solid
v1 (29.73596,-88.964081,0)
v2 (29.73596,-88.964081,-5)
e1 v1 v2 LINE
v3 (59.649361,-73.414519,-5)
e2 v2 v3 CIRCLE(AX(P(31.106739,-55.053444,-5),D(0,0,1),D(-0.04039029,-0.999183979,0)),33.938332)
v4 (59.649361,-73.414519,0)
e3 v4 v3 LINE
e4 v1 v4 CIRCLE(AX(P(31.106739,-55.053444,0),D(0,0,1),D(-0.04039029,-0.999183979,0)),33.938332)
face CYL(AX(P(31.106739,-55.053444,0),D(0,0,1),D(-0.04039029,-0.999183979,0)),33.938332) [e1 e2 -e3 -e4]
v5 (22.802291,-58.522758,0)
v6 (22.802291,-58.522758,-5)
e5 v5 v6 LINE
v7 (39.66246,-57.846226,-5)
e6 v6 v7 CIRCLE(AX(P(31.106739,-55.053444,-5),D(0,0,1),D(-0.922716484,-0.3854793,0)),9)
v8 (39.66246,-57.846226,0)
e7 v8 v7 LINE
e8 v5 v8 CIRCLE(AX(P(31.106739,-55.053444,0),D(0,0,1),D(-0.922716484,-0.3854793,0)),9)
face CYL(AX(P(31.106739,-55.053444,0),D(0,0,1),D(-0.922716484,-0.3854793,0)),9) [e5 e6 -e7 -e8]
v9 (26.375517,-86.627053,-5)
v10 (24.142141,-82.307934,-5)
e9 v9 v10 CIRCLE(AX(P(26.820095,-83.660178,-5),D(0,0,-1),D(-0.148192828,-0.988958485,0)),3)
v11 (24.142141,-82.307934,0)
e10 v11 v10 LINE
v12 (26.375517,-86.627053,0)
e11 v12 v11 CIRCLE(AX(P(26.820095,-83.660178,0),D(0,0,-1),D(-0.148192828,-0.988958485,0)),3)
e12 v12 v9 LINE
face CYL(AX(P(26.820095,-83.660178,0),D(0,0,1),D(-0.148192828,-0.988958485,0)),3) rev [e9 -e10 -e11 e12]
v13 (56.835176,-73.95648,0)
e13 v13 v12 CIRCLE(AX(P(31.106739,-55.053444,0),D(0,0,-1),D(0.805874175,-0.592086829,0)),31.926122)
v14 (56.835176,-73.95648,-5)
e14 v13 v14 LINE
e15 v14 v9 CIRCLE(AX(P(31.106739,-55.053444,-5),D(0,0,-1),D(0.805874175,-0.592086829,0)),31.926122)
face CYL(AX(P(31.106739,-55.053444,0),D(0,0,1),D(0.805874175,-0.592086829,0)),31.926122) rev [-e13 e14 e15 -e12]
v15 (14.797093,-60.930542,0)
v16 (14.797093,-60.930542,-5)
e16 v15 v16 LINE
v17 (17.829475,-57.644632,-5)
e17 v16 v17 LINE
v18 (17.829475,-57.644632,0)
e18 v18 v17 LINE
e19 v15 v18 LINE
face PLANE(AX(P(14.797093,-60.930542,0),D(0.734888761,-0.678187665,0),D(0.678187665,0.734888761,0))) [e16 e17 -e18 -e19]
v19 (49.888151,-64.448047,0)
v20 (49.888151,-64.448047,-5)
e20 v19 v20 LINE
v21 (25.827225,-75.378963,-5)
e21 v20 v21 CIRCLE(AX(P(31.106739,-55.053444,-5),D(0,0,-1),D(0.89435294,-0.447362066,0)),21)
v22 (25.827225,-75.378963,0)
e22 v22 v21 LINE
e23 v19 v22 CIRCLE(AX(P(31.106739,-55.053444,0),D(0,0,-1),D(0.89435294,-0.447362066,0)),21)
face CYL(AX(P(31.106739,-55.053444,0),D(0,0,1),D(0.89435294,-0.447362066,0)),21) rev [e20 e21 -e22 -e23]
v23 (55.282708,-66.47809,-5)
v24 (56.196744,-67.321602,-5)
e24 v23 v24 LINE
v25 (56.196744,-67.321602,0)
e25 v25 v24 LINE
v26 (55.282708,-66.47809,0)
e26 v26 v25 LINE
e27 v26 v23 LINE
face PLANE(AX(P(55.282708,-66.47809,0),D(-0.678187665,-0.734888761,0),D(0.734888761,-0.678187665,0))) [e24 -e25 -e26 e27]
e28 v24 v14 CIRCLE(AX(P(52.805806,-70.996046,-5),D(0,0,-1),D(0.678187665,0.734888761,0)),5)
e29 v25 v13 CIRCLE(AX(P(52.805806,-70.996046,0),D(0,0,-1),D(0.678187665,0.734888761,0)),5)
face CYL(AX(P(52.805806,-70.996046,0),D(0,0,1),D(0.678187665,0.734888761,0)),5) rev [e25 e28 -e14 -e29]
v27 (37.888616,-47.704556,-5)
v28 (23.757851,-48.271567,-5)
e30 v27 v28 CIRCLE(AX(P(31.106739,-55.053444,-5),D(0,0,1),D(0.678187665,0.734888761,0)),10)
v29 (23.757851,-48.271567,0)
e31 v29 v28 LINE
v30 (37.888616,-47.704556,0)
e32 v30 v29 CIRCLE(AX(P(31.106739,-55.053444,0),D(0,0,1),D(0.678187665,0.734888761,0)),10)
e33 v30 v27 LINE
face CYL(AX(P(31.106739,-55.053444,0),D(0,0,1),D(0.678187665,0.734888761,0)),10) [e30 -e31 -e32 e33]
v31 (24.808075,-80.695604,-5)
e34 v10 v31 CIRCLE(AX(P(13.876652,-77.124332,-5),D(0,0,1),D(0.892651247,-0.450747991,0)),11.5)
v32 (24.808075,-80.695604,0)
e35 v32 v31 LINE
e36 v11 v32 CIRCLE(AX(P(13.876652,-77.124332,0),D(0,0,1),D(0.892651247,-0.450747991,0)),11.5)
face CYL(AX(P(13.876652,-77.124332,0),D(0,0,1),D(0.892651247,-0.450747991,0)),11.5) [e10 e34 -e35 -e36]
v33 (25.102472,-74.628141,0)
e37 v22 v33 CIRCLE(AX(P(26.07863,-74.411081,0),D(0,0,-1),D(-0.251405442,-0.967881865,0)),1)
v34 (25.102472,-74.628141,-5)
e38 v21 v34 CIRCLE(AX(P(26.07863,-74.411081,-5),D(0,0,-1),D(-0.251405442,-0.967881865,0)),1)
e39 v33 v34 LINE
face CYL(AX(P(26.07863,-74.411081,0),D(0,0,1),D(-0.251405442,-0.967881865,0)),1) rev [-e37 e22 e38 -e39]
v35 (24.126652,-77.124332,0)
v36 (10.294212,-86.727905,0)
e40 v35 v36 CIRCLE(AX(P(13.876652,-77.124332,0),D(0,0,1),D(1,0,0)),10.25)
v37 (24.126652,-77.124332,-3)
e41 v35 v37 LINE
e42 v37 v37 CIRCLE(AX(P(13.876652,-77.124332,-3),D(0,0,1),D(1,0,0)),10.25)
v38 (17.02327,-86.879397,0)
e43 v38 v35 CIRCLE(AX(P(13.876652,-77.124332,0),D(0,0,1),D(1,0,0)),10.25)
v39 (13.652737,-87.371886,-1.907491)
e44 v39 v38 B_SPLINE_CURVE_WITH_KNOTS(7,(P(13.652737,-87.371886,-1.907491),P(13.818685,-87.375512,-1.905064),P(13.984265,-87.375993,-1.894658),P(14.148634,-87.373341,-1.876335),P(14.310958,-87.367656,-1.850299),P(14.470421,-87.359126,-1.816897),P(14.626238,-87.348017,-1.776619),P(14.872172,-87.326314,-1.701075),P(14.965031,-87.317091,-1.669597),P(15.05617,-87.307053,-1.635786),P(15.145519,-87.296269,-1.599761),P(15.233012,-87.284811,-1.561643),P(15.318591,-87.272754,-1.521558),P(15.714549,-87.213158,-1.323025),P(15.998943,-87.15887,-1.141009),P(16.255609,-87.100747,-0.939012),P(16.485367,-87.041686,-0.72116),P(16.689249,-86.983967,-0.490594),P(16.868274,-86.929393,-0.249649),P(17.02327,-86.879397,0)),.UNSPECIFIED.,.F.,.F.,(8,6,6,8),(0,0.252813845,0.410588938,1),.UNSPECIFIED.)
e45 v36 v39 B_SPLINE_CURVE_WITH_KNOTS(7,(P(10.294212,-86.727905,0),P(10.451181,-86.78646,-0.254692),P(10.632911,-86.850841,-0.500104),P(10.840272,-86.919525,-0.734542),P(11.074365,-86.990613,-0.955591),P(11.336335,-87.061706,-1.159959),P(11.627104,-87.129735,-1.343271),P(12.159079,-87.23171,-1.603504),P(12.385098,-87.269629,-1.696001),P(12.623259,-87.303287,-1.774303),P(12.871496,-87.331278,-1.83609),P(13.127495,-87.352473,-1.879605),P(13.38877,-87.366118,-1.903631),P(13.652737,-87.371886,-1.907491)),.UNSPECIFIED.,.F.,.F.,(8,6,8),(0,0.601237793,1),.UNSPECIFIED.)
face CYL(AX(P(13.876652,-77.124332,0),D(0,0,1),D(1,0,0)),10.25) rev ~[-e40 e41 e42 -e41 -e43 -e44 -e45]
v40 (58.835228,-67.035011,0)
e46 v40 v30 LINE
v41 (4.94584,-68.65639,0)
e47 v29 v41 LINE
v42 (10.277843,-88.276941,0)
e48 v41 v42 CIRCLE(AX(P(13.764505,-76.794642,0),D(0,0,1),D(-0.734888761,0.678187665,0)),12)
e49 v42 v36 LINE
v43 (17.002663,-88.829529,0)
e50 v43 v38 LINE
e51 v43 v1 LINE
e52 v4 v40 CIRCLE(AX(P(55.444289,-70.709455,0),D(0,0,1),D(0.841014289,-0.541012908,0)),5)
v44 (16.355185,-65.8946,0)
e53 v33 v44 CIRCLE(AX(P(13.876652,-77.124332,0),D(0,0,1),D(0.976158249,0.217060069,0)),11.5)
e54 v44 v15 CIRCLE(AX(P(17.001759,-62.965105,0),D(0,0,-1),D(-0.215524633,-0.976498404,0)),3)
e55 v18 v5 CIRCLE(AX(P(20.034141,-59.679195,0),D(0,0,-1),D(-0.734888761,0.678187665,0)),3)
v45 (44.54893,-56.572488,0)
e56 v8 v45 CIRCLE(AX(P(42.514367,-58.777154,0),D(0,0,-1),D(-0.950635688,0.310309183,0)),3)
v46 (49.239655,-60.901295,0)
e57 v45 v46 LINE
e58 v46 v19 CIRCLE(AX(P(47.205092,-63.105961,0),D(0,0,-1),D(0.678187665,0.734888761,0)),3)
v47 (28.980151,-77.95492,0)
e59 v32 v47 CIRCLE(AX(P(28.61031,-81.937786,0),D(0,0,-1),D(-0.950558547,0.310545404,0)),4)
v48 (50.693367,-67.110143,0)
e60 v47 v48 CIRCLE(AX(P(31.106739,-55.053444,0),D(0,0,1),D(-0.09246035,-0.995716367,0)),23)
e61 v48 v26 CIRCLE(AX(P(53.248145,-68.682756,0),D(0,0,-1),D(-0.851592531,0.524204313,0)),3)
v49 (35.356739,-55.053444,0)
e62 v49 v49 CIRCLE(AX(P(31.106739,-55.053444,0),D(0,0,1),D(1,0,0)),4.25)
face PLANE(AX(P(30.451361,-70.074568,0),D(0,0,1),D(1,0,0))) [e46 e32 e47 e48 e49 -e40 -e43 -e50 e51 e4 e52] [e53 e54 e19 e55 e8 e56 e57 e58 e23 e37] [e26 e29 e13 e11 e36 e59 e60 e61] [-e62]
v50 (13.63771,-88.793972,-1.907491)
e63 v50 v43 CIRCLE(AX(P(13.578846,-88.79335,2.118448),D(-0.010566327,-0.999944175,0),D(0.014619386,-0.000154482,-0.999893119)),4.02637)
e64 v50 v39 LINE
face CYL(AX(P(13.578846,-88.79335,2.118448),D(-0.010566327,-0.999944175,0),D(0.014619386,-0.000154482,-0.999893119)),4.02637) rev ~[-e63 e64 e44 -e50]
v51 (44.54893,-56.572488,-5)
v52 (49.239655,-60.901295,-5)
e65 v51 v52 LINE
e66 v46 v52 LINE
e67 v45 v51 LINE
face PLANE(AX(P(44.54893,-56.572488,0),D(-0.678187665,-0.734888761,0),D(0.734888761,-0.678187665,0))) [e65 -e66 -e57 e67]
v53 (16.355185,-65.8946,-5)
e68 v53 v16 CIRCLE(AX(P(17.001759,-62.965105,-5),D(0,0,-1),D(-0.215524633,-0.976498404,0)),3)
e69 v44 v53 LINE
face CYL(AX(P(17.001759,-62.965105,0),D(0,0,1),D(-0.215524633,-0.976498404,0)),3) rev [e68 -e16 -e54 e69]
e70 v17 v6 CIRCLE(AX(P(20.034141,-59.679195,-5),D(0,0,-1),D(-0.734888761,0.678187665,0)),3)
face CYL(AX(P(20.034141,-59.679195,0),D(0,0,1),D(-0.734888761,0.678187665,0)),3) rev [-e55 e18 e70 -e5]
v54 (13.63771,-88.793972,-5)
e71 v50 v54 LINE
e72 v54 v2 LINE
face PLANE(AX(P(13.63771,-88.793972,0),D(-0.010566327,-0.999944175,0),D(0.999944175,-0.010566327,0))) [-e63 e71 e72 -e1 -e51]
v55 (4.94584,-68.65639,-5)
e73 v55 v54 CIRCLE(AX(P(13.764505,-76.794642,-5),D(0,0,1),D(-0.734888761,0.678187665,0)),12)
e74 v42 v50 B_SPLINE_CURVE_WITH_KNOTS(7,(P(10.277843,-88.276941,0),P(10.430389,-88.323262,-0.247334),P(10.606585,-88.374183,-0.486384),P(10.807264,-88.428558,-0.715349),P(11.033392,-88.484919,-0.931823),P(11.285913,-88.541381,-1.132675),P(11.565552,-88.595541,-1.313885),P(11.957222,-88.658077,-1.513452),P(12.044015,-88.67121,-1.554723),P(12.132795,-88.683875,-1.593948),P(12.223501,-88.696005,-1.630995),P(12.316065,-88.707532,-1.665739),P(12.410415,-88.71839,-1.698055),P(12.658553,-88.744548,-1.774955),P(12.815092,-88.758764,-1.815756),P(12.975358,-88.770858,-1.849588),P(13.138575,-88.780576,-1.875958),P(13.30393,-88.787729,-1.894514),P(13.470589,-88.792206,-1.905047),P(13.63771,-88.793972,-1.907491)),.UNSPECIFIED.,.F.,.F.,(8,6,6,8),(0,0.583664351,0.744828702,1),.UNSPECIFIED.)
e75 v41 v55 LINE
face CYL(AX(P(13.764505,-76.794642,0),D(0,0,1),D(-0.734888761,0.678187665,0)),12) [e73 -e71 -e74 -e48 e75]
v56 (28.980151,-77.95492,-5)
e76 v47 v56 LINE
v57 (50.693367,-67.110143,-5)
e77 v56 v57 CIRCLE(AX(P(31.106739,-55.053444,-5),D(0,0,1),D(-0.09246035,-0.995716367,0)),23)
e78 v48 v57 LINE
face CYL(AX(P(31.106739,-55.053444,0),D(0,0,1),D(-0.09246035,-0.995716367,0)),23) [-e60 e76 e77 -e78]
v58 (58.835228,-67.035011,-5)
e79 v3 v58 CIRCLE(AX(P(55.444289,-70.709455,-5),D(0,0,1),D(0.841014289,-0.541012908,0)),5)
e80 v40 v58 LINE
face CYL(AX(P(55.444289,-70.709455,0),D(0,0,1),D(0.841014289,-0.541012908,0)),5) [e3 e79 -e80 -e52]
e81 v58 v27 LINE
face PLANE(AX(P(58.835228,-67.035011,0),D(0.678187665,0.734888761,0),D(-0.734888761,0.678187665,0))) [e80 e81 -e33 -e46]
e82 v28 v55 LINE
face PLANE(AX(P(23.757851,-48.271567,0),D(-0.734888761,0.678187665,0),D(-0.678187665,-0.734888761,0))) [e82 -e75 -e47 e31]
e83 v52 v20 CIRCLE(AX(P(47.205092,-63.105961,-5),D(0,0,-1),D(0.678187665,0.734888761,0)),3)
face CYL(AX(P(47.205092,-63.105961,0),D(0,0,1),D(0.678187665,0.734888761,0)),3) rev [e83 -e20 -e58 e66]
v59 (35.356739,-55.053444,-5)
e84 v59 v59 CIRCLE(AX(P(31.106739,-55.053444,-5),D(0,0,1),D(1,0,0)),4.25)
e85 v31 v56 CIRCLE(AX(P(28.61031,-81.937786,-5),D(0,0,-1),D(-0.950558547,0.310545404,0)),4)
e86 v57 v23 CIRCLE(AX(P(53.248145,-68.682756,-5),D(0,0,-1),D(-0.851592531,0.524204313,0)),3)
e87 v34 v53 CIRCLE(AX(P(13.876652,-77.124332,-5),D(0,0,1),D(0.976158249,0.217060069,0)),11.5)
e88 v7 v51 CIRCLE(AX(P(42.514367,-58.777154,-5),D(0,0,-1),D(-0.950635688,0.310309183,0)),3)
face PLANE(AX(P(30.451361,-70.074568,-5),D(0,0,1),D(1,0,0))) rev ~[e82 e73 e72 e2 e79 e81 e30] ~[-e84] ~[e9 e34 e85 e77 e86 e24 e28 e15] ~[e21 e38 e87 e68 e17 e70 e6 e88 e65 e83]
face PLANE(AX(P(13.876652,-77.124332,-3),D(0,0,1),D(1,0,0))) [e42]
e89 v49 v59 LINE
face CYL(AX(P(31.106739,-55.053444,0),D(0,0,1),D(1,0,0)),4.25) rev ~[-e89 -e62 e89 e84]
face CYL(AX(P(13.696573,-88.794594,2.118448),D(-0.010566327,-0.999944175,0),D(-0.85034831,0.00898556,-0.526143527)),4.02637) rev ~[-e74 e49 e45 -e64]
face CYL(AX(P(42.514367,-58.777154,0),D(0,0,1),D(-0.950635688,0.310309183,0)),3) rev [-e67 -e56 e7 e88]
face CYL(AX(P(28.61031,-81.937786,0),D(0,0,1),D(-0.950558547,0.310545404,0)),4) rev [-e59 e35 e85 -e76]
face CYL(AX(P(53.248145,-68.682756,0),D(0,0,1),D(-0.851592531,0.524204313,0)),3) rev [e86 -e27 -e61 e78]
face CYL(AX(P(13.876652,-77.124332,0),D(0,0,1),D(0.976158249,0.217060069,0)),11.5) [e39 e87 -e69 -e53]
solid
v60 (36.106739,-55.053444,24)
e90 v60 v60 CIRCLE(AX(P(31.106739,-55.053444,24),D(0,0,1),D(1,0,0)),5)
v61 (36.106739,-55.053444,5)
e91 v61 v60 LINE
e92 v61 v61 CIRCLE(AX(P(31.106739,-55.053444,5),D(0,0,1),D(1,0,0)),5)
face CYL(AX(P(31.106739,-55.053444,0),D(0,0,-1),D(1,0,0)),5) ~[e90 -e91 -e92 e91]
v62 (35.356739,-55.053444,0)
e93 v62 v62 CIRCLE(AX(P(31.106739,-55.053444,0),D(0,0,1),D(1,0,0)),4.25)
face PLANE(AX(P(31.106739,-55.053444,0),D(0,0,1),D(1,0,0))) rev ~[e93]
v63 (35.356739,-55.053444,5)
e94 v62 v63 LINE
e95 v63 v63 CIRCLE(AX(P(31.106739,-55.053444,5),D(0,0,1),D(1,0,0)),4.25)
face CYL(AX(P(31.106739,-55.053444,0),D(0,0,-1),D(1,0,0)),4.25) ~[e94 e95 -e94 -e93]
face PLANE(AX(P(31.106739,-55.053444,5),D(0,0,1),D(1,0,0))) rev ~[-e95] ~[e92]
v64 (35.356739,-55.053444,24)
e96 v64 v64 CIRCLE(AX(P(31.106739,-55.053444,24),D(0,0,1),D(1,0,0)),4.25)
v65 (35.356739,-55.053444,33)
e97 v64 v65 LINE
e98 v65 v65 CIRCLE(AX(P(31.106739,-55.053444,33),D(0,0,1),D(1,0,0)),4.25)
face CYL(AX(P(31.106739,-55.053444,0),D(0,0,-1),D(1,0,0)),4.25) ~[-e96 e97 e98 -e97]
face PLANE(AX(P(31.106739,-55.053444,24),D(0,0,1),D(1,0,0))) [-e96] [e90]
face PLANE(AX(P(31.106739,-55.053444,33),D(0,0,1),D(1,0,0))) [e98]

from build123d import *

# Parameters (mm, degrees)
F0_R     = 10.25
F0_R_2   = 5
F0_R_3   = 4.25
F1_DEPTH = 5
F2_DEPTH = 33
F3_DEPTH = 24
F4_DEPTH = 3
F5_DEPTH = 5
F7_DEPTH = 2.0316230768


# Not quite as in the source:
# - a feature names something its author has since deleted; it is built from what else it names


with BuildPart() as f1:
    # F0 (on Top) → F1 (new body)
    with BuildSketch(Plane.XY):
        with BuildLine():
            ThreePointArc((37.8886156331, -47.7045562268), (30.7058016888, -45.0614846038), (23.757851373, -48.271567184))
            Line((23.757851373, -48.271567184), (4.9458403192, -68.6563901516))
            ThreePointArc((4.9458403192, -68.6563901516), (2.7469798041, -81.5500736227), (13.6377095304, -88.793972231))
            Line((13.6377095304, -88.793972231), (29.73595993, -88.9640810988))
            ThreePointArc((29.73595993, -88.9640810988), (46.7599967293, -85.1663293947), (59.6493608288, -73.4145193188))
            ThreePointArc((59.6493608288, -73.4145193188), (60.4040648618, -70.0765035789), (58.8352277111, -67.0350109763))
            Line((58.8352277111, -67.0350109763), (37.8886156331, -47.7045562268))
        make_face()
        with Locations((13.8766520367, -77.1243319886)):
            Circle(F0_R, mode=Mode.SUBTRACT)
        with BuildLine():
            ThreePointArc((26.3755166306, -86.6270533164), (24.155278042, -85.0381292254), (24.1421413752, -82.307933887))
            ThreePointArc((24.1421413752, -82.307933887), (24.5057243444, -81.5144142062), (24.808075333, -80.6956041311))
            ThreePointArc((24.808075333, -80.6956041311), (26.4141385233, -78.5946086732), (28.9801509243, -77.9549202777))
            ThreePointArc((28.9801509243, -77.9549202777), (41.3836815678, -75.6297518396), (50.6933671902, -67.110143028))
            ThreePointArc((50.6933671902, -67.110143028), (52.8388421265, -65.7108085683), (55.2827077781, -66.4780896835))
            Line((55.2827077781, -66.4780896835), (56.196743854, -67.321602369))
            ThreePointArc((56.196743854, -67.321602369), (57.7828175357, -70.5171396289), (56.835176405, -73.9564803202))
            ThreePointArc((56.835176405, -73.9564803202), (43.3687378078, -84.5309041293), (26.3755166306, -86.6270533164))
        make_face(mode=Mode.SUBTRACT)
        with BuildLine():
            ThreePointArc((17.829474896, -57.6446324429), (20.5558252215, -56.7249026703), (22.8022906293, -58.5227575376))
            ThreePointArc((22.8022906293, -58.5227575376), (31.4675825452, -64.046207144), (39.6624601723, -57.8462264813))
            ThreePointArc((39.6624601723, -57.8462264813), (41.7576536692, -55.8741582362), (44.5489302313, -56.5724877473))
            Line((44.5489302313, -56.5724877473), (49.2396549007, -60.901294746))
            ThreePointArc((49.2396549007, -60.901294746), (50.1561683514, -62.5663798864), (49.8881507259, -64.4480472275))
            ThreePointArc((49.8881507259, -64.4480472275), (39.7927356809, -74.1728962685), (25.8272247035, -75.3789629921))
            ThreePointArc((25.8272247035, -75.3789629921), (25.3591431783, -75.10558707), (25.1024718967, -74.6281411964))
            ThreePointArc((25.1024718967, -74.6281411964), (22.0019832723, -68.9862122849), (16.3551853155, -65.8946003451))
            ThreePointArc((16.3551853155, -65.8946003451), (14.1394417768, -63.8635142203), (14.7970929317, -60.9305421383))
            Line((14.7970929317, -60.9305421383), (17.829474896, -57.6446324429))
        make_face(mode=Mode.SUBTRACT)
        with Locations((31.1067389816, -55.0534438355)):
            Circle(F0_R_2, mode=Mode.SUBTRACT)
        with Locations((13.8766520367, -77.1243319886)):
            Circle(F0_R)
        with Locations((31.1067389816, -55.0534438355)):
            Circle(F0_R_2)
        with Locations((31.1067389816, -55.0534438355)):
            Circle(F0_R_3, mode=Mode.SUBTRACT)
    extrude(amount=-F1_DEPTH)



with BuildPart() as f2:
    # F0 (on Top) → F2 (new body)
    with BuildSketch(Plane.XY):
        with Locations((31.1067389816, -55.0534438355)):
            Circle(F0_R_3)
    extrude(amount=F2_DEPTH)


with BuildPart() as f1_1:
    add(f1.part)

    add(f2.part)  # F3 merges F2
    # F0 (on Top) → F3 (join)
    with BuildSketch(Plane.XY):
        with Locations((31.1067389816, -55.0534438355)):
            Circle(F0_R_2)
        with Locations((31.1067389816, -55.0534438355)):
            Circle(F0_R_3, mode=Mode.SUBTRACT)
    extrude(amount=F3_DEPTH)

    # F0 (on Top) → F4 (cut)
    with BuildSketch(Plane.XY):
        with Locations((13.8766520367, -77.1243319886)):
            Circle(F0_R)
    extrude(amount=-F4_DEPTH, mode=Mode.SUBTRACT)

    # F0 (on Top) → F5 (cut)
    with BuildSketch(Plane.XY):
        with Locations((31.1067389816, -55.0534438355)):
            Circle(F0_R_2)
        with Locations((31.1067389816, -55.0534438355)):
            Circle(F0_R_3, mode=Mode.SUBTRACT)
    extrude(amount=F5_DEPTH, mode=Mode.SUBTRACT)

    # F6 (on face) → F7 (cut, through all)
    with BuildSketch(Plane(origin=(-0.9366511213, -88.639966179, 0), x_dir=(0.9999441748, -0.0105663266, 0), z_dir=(-0.0105663266, -0.9999441748, 0))):
        with BuildLine():
            Line((14.5751743135, -1.9074911252), (14.5751743135, 0))
            Line((14.5751743135, 0), (11.210032617, 0))
            ThreePointArc((11.210032617, 0), (12.6485346529, -1.384324833), (14.5751743135, -1.9074911252))
        make_face()
        with BuildLine():
            ThreePointArc((14.5751743135, -1.9074911252), (16.501813974, -1.384324833), (17.94031601, 0))
            Line((17.94031601, 0), (14.5751743135, 0))
            Line((14.5751743135, 0), (14.5751743135, -1.9074911252))
        make_face()
    extrude(amount=-F7_DEPTH, mode=Mode.SUBTRACT)


solid = f1_1.part
